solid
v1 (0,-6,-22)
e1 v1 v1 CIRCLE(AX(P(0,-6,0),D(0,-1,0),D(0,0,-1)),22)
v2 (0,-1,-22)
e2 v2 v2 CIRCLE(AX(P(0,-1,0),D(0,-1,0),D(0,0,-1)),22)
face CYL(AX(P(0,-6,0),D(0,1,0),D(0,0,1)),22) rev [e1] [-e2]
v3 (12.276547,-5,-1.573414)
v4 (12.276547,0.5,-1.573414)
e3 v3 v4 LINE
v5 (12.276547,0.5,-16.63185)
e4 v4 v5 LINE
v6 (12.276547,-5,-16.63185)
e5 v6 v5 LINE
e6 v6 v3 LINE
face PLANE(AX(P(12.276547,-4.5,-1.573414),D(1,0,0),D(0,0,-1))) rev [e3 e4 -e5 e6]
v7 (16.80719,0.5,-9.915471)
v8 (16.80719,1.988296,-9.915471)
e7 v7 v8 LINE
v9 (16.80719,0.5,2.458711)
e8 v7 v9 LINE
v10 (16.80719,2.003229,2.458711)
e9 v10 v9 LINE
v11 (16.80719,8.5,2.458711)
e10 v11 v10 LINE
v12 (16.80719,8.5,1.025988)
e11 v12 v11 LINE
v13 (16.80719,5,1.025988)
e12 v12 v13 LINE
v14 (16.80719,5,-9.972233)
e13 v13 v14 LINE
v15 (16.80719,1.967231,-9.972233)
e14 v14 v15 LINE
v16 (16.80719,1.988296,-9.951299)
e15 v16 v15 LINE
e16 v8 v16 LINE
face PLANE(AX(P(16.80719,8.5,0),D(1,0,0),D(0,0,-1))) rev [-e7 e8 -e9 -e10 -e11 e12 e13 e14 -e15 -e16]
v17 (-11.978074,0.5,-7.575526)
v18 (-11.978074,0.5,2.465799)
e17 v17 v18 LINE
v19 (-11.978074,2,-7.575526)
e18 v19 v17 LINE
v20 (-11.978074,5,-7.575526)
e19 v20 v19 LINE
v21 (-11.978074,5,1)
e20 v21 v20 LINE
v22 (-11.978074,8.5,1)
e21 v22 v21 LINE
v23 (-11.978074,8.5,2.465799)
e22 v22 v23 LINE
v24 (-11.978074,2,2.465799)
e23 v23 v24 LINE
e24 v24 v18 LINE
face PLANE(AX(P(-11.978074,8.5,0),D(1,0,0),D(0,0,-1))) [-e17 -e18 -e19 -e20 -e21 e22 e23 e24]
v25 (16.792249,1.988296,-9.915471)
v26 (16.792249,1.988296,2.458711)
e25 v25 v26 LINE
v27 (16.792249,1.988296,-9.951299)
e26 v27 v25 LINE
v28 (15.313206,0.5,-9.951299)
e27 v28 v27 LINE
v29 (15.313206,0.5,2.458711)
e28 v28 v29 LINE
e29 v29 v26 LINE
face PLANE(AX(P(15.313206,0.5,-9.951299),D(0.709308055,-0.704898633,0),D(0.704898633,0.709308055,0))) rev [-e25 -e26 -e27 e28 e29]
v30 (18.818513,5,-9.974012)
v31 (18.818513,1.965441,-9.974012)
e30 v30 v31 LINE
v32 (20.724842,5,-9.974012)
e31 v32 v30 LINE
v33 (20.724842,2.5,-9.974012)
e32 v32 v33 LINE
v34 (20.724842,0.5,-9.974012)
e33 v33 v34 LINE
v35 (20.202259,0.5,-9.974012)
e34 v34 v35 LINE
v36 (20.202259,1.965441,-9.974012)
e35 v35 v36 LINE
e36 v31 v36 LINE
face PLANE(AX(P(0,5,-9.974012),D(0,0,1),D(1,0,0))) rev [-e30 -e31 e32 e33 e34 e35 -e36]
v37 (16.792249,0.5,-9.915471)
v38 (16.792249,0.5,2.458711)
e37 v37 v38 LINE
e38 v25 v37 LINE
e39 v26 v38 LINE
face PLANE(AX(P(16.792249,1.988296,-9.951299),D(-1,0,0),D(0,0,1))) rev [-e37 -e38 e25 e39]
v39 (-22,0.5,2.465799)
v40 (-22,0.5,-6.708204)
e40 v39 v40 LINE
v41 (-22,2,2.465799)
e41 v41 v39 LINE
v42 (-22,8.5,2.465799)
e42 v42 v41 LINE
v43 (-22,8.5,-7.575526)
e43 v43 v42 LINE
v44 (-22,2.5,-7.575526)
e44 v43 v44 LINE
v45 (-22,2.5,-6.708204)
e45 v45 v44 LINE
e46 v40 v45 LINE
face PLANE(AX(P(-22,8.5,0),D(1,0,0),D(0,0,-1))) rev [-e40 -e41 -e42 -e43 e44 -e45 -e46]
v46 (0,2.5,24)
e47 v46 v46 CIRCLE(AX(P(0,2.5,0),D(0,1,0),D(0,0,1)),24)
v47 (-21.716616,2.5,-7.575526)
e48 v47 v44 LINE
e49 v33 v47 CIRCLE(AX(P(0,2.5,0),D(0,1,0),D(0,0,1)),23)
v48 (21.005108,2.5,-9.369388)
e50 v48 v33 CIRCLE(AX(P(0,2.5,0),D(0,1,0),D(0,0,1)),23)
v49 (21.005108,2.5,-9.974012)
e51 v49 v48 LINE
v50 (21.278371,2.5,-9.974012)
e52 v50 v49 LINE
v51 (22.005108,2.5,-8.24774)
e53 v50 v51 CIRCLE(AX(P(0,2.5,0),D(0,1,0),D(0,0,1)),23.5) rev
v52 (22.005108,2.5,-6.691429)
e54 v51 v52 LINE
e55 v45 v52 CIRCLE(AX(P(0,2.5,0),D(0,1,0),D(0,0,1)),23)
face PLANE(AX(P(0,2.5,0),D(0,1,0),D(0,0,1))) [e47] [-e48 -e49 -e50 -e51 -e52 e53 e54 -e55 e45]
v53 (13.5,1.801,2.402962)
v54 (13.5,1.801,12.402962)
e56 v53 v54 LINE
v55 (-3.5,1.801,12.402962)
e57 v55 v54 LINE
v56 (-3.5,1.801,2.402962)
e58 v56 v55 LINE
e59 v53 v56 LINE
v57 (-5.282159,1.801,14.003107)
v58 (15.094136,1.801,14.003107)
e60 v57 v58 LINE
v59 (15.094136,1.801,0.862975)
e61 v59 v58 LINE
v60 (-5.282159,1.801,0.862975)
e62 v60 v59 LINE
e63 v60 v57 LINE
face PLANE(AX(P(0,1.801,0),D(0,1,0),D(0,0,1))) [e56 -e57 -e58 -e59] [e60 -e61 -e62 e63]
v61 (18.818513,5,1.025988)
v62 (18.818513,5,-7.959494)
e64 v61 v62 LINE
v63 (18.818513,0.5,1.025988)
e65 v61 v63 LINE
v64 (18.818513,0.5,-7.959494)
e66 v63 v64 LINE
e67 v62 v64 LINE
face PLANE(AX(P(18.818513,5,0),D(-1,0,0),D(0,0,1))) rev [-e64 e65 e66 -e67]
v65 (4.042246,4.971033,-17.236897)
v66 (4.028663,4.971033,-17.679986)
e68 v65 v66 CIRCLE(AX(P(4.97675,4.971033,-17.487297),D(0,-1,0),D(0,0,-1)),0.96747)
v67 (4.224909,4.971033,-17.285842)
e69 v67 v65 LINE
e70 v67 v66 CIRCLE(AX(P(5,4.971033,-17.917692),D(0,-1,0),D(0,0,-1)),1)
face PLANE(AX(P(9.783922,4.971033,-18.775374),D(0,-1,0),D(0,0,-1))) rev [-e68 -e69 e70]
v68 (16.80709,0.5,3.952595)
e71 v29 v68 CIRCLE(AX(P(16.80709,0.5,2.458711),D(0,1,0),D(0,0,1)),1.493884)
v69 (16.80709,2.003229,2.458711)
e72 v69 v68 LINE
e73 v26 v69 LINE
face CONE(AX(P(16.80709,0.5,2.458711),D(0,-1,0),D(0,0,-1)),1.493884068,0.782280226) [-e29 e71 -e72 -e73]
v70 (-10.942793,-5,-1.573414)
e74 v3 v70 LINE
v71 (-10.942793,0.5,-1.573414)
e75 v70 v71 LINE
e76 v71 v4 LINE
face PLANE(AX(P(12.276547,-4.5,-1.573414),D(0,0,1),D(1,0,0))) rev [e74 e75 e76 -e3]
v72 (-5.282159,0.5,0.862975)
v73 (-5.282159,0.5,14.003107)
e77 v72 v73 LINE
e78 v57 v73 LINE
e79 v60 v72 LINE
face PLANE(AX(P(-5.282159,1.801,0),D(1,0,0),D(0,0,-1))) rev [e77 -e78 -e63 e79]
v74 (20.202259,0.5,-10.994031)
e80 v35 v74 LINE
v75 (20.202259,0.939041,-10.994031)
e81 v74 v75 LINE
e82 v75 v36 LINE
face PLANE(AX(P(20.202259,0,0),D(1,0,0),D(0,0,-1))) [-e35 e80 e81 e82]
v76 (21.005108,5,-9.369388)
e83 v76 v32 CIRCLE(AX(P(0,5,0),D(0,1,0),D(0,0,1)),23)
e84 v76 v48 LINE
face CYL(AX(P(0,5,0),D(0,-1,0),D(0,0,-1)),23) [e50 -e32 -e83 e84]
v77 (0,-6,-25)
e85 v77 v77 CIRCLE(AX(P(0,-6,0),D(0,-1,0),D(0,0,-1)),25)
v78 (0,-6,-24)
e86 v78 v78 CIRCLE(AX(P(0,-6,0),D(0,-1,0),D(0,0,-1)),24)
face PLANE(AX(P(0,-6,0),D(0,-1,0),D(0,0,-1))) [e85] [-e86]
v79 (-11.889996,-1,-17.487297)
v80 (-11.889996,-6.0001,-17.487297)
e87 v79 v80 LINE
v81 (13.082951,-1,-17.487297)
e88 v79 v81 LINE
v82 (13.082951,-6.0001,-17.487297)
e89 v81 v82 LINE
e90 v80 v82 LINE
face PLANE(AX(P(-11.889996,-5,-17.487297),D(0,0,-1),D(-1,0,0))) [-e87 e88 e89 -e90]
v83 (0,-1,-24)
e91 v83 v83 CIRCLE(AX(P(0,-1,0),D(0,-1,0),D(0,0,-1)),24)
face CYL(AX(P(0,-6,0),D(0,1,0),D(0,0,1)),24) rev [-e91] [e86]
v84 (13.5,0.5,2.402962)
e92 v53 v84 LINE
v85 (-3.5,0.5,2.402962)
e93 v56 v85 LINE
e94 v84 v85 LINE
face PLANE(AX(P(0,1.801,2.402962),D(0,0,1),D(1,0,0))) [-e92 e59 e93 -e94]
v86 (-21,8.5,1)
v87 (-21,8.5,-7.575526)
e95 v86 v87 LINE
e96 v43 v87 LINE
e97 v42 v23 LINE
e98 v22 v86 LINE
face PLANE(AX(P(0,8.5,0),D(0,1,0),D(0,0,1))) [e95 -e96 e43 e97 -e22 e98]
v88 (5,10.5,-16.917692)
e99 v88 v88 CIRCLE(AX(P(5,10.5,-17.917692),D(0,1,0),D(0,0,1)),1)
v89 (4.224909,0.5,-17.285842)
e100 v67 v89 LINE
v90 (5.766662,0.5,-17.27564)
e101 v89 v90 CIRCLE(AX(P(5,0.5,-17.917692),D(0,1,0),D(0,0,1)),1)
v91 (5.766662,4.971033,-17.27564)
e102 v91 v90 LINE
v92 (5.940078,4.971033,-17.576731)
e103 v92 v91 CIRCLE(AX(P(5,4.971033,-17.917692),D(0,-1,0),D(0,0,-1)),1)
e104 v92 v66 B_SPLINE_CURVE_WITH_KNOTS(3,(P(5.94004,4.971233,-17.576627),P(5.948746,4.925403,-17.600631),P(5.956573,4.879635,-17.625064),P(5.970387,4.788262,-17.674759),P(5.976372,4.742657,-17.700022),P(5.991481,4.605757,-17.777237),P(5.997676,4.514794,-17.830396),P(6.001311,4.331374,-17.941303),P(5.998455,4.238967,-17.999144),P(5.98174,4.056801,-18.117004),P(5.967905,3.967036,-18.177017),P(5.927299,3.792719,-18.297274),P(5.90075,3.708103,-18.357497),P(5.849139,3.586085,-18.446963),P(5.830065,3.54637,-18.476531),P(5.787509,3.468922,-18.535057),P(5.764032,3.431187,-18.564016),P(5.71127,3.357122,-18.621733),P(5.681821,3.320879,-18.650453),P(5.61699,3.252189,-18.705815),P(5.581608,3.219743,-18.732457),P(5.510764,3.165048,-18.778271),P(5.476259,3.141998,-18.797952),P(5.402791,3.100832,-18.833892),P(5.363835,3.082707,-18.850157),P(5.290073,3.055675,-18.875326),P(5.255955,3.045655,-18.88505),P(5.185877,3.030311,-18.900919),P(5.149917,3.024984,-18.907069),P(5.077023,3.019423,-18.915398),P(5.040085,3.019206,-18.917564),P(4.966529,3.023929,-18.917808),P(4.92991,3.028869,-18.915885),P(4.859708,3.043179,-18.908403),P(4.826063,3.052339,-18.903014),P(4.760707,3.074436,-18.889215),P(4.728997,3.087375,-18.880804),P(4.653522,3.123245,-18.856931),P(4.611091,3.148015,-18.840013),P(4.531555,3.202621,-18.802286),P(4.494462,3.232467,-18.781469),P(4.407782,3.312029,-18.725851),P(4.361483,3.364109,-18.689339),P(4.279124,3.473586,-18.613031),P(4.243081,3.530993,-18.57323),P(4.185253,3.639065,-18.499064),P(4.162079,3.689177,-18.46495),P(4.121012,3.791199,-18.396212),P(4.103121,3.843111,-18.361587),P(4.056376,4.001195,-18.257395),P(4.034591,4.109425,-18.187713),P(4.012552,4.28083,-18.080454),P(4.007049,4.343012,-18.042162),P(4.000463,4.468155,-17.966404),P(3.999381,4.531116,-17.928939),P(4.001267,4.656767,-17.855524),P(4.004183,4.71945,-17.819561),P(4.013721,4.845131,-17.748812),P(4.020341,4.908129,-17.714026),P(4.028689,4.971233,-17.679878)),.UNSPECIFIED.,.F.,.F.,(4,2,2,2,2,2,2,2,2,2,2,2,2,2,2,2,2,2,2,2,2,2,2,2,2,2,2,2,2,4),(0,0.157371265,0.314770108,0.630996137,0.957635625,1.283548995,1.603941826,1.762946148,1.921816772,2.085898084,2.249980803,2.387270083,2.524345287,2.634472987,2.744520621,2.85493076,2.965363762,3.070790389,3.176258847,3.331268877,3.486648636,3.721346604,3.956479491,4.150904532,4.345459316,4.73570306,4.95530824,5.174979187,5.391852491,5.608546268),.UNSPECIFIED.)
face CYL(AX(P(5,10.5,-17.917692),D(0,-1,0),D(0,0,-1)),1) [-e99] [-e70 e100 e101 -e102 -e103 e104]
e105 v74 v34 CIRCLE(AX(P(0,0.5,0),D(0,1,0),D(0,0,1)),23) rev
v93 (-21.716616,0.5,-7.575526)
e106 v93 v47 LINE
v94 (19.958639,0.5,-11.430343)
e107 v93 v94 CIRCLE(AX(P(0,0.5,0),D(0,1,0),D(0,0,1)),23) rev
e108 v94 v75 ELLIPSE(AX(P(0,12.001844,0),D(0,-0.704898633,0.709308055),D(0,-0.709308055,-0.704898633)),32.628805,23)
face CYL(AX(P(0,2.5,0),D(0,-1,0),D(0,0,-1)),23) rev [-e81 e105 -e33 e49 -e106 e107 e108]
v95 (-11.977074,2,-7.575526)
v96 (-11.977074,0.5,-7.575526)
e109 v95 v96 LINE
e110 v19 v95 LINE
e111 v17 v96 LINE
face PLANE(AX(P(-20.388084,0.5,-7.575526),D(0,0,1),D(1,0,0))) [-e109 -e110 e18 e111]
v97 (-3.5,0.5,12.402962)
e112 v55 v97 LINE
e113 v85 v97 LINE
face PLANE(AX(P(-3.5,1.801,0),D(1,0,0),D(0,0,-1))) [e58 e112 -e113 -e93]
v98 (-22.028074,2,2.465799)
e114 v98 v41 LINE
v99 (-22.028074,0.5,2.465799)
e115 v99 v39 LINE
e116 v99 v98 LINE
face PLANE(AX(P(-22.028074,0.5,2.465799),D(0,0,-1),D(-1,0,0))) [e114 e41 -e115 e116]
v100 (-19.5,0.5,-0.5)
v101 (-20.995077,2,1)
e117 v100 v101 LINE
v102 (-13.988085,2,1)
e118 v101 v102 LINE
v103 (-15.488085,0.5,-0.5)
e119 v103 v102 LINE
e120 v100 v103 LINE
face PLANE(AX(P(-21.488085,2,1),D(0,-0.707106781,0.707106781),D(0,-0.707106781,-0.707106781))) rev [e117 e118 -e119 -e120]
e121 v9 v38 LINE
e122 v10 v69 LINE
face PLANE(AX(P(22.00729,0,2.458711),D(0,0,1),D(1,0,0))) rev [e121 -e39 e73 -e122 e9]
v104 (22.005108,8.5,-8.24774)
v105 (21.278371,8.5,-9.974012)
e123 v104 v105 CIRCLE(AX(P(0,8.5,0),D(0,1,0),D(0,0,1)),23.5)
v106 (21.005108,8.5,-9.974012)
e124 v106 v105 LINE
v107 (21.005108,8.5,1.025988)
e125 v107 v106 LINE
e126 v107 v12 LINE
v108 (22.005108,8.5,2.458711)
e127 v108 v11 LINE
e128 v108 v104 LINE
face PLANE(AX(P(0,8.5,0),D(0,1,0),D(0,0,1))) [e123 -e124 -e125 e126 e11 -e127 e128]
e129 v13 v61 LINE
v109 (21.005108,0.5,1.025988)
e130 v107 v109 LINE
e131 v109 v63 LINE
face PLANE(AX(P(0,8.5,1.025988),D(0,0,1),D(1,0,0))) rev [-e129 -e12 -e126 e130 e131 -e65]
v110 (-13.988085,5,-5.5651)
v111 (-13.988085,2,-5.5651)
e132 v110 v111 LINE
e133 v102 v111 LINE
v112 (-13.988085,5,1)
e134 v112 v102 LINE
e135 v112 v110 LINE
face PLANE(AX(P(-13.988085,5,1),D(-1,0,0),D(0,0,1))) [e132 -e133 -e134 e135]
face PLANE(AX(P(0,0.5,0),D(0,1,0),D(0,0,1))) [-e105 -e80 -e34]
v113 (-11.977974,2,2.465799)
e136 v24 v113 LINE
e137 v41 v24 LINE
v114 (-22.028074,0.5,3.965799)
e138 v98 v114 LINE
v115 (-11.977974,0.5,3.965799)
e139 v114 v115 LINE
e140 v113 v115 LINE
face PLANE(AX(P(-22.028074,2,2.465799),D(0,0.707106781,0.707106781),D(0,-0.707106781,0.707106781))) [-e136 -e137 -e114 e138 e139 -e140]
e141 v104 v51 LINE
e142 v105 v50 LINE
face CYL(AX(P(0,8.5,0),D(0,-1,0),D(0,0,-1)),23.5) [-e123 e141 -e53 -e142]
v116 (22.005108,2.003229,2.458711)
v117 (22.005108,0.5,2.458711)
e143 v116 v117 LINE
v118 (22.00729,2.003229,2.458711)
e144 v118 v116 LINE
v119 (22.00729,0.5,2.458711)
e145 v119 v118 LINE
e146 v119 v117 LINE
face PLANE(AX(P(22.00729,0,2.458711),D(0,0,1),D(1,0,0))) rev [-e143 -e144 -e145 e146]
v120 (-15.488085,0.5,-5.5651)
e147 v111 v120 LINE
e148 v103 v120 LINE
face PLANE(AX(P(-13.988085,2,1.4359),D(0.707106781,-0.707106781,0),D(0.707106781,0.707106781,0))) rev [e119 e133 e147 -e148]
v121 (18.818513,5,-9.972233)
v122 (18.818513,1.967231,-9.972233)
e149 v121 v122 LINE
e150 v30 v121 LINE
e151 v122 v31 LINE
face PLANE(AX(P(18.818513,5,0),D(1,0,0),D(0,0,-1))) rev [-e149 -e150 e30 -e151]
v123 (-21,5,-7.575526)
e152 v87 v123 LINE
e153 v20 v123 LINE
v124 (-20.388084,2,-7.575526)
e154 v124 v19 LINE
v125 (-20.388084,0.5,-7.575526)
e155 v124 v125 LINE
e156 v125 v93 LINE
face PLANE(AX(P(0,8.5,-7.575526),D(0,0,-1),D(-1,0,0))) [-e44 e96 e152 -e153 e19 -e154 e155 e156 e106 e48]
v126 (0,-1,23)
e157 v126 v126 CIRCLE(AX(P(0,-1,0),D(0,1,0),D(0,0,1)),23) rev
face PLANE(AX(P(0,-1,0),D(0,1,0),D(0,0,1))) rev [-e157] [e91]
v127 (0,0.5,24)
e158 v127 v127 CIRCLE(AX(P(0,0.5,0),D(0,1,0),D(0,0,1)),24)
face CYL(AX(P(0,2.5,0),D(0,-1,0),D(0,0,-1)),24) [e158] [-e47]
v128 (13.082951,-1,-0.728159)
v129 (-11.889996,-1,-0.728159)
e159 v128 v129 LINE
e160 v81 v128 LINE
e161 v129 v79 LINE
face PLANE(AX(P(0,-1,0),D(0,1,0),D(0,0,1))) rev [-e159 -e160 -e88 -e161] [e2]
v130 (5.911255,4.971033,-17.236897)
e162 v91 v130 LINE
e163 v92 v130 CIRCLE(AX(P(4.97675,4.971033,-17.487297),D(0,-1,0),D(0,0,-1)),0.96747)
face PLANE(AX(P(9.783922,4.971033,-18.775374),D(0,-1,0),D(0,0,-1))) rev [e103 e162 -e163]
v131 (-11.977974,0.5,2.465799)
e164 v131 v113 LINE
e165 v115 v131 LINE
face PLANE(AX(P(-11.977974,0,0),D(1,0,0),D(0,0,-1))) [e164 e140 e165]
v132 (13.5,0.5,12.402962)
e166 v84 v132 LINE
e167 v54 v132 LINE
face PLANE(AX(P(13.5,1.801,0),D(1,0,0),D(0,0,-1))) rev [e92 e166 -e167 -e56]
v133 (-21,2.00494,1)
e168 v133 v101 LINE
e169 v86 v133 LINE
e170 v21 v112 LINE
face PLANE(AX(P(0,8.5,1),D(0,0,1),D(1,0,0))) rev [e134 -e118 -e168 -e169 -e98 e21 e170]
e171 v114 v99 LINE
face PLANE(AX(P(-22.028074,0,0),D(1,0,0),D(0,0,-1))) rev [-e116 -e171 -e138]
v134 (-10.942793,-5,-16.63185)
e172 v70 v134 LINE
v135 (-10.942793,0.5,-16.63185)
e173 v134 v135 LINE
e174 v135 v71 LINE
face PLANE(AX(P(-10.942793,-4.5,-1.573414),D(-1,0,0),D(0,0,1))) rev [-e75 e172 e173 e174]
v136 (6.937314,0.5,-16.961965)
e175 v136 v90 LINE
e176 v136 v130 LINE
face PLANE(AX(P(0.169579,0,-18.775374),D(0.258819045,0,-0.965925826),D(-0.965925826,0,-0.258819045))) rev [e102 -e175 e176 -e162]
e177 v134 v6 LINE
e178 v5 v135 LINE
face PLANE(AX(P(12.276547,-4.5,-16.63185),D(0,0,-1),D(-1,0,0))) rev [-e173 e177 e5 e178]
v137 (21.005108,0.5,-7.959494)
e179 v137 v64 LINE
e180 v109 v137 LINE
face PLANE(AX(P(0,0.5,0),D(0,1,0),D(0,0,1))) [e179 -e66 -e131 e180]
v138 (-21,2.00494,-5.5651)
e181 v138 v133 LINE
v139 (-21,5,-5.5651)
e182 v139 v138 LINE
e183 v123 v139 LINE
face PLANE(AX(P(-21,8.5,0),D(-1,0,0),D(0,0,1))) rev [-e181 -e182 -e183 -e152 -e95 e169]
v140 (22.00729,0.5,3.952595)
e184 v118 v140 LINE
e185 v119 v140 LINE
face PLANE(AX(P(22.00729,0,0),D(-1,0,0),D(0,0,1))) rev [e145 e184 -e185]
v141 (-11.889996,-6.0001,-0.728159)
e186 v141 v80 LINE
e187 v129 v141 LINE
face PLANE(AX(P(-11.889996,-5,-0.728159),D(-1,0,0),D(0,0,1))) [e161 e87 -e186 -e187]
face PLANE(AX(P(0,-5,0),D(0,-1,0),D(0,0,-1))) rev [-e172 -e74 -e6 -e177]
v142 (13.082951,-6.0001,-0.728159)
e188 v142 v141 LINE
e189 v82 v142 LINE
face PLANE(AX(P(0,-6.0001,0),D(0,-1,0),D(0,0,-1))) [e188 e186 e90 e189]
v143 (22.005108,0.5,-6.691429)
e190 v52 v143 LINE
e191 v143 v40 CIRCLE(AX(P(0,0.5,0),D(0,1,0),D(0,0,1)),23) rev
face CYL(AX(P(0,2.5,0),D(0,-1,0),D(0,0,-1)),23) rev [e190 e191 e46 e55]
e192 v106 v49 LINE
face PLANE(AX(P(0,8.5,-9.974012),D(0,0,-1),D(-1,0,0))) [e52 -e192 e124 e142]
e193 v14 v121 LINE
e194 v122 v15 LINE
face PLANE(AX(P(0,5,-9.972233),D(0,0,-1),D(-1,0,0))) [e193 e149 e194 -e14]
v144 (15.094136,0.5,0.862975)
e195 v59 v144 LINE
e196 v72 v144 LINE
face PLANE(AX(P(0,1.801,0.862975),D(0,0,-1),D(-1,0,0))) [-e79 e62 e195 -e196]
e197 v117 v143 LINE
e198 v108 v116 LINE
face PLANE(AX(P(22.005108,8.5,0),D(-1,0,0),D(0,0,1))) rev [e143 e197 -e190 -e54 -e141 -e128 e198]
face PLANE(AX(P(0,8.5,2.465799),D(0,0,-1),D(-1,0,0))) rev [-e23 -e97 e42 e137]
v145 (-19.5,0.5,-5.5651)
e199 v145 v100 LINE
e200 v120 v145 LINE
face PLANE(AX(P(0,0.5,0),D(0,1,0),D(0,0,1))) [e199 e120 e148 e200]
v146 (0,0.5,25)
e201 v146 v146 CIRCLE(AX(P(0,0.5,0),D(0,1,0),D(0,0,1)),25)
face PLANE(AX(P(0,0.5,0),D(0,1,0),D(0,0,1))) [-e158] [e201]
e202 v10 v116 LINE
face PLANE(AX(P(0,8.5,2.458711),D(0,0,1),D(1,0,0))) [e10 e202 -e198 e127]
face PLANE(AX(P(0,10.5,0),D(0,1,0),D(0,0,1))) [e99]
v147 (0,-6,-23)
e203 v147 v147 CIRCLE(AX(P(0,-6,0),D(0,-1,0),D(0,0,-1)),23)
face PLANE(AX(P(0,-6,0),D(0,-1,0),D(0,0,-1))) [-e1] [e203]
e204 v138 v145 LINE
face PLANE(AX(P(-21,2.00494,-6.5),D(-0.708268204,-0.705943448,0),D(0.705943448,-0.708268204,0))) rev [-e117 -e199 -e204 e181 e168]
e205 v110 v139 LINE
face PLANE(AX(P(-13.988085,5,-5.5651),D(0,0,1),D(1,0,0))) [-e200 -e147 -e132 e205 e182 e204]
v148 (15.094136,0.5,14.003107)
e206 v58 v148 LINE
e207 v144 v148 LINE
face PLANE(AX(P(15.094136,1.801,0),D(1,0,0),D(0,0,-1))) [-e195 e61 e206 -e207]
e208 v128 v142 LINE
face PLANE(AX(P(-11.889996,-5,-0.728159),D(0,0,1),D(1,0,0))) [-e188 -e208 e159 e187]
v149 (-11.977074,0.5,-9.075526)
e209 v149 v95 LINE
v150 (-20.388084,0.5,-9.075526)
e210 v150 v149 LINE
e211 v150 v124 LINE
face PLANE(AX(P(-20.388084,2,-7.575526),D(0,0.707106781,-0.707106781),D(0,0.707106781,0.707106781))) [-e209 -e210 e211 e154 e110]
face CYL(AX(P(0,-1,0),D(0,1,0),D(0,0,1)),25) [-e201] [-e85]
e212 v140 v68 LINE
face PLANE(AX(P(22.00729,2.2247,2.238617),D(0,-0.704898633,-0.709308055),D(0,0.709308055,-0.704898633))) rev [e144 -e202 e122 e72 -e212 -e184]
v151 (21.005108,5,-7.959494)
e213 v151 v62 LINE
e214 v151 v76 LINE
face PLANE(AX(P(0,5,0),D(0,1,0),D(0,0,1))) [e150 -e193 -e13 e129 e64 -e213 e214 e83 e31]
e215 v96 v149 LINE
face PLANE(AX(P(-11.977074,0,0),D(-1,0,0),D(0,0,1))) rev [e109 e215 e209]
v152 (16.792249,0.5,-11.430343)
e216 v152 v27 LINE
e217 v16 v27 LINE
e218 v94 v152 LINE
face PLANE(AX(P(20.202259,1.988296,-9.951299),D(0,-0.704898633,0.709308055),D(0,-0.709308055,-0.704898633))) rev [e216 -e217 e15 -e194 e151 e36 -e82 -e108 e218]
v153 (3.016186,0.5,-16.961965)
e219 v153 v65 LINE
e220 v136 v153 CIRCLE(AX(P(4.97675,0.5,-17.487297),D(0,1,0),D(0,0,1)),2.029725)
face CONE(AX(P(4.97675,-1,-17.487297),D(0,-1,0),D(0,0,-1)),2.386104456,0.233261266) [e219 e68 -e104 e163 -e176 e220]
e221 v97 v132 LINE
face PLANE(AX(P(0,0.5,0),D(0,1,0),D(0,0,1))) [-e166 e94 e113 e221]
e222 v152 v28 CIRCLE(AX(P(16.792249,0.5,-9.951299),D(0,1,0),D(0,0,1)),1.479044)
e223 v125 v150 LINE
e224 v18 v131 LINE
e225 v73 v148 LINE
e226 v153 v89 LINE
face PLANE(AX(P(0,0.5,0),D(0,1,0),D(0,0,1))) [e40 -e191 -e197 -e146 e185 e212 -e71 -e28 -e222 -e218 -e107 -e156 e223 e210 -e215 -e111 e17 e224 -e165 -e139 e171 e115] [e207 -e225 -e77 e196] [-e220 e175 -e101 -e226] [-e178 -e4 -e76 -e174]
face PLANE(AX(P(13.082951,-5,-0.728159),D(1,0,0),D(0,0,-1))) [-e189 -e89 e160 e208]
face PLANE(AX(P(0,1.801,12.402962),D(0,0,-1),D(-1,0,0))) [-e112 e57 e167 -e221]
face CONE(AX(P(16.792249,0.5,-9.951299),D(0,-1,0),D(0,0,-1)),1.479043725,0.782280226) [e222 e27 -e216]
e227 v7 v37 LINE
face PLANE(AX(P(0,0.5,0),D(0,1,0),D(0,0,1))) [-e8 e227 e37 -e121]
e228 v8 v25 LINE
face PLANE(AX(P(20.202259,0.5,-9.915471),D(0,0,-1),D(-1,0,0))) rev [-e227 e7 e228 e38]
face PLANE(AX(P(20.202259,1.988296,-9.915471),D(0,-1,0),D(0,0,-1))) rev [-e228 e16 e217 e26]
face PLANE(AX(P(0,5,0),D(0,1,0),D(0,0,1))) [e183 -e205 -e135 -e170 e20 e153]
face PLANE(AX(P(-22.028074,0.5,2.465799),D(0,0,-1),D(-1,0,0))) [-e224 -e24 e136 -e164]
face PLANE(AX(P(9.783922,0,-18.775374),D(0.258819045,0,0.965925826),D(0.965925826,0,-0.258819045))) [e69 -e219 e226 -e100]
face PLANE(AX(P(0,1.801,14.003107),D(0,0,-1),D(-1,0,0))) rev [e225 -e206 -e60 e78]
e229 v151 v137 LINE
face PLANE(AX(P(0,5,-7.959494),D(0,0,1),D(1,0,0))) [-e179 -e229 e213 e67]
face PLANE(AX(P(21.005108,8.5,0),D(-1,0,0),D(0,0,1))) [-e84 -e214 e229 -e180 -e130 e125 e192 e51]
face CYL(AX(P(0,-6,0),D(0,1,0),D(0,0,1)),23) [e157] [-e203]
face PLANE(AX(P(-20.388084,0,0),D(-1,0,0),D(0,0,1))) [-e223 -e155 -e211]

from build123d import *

# Parameters (mm, degrees)
BOSS_EXTRUDE1_DEPTH       = 0.5
BOSS_EXTRUDE1_DEPTH_BACK  = 1
SKETCH1_R                 = 25
SKETCH17_R                = 24
SKETCH17_R_2              = 23
BOSS_EXTRUDE15_DEPTH      = 2
SKETCH2_R                 = 1
BOSS_EXTRUDE2_DEPTH       = 10
SKETCH12_W                = 23.219340148
SKETCH12_H                = 15.058436642
CUT_EXTRUDE2_DEPTH        = 5
SKETCH15_W                = 24.972946701
SKETCH15_H                = 16.75913787
SKETCH15_W_2              = 23.219340148
SKETCH15_H_2              = 15.058436642
BOSS_EXTRUDE13_DEPTH      = 5
BOSS_EXTRUDE14_DEPTH      = 0.0001
BOSS_EXTRUDE14_DEPTH_BACK = 1
SKETCH16_W                = 24.972946701
SKETCH16_H                = 16.75913787
BOSS_EXTRUDE16_DEPTH      = 8
BOSS_EXTRUDE17_DEPTH      = 1.301
BOSS_EXTRUDE18_DEPTH      = 4.5
REVOLVE1_ANGLE            = 195
REVOLVE1_OTHER_WAY_ANGLE  = 15
BOSS_EXTRUDE20_DEPTH      = 7.5
BOSS_EXTRUDE21_DEPTH      = 7.5
BOSS_EXTRUDE22_DEPTH      = 0.0001
BOSS_EXTRUDE22_DEPTH_BACK = 10.05
BOSS_EXTRUDE23_DEPTH      = 0.0001
BOSS_EXTRUDE23_DEPTH_BACK = 5.2001
REVOLVE2_ANGLE            = 90
BOSS_EXTRUDE25_DEPTH      = 12.41001
REVOLVE3_ANGLE            = 90
BOSS_EXTRUDE26_DEPTH      = 3.41001
BOSS_EXTRUDE27_DEPTH      = 0.001
BOSS_EXTRUDE27_DEPTH_BACK = 8.41001
BOSS_EXTRUDE28_DEPTH      = 7.001
BOSS_EXTRUDE29_START      = 5
SKETCH39_R                = 25
SKETCH39_R_2              = 24
SKETCH39_R_3              = 23
SKETCH39_R_4              = 22
BOSS_EXTRUDE29_DEPTH      = 5


# Read off the part's stored shape, not the designer's step: Boss-Extrude18
with BuildPart() as part:
    # Sketch1 → Boss-Extrude1 (new, two sides: drawn at the far end of the back side and taken through both)
    with BuildSketch(Plane(origin=(0, 0, 0), x_dir=(1, 0, 0), z_dir=(0, 1, 0)).offset(-BOSS_EXTRUDE1_DEPTH_BACK)):
        with Locations(Location((0, 0, 0), (0, 0, 270))):
            Circle(SKETCH1_R)
    extrude(amount=BOSS_EXTRUDE1_DEPTH + BOSS_EXTRUDE1_DEPTH_BACK)

    # Sketch17 → Boss-Extrude15 (add)
    with BuildSketch(Plane(origin=(0, 0.5, 0), x_dir=(1, 0, 0), z_dir=(0, 1, 0))):
        with Locations(Location((0, 0, 0), (0, 0, 270))):
            Circle(SKETCH17_R)
        with Locations(Location((0, 0, 0), (0, 0, 270))):
            Circle(SKETCH17_R_2, mode=Mode.SUBTRACT)
    extrude(amount=BOSS_EXTRUDE15_DEPTH)

    # Sketch2 → Boss-Extrude2 (add)
    with BuildSketch(Plane(origin=(0, 0.5, 0), x_dir=(1, 0, 0), z_dir=(0, 1, 0))):
        with Locations(Location((5, 17.917691699, 0), (0, 0, 270))):
            Circle(SKETCH2_R)
    extrude(amount=BOSS_EXTRUDE2_DEPTH)

    # Sketch12 → Cut-Extrude2 (cut)
    with BuildSketch(Plane(origin=(0, 0.5, 0), x_dir=(1, 0, 0), z_dir=(0, 1, 0))):
        with Locations((0.666876956, 9.102631979)):
            Rectangle(SKETCH12_W, SKETCH12_H)
    extrude(amount=-CUT_EXTRUDE2_DEPTH, mode=Mode.SUBTRACT)

    # Sketch15 → Boss-Extrude13 (add)
    with BuildSketch(Plane.XZ.offset(1)):
        with Locations((0.596477735, -9.107727728)):
            Rectangle(SKETCH15_W, SKETCH15_H)
        with Locations((0.666876956, -9.102631979)):
            Rectangle(SKETCH15_W_2, SKETCH15_H_2, mode=Mode.SUBTRACT)
    extrude(amount=BOSS_EXTRUDE13_DEPTH)

    # Sketch3 → Boss-Extrude16 (add)
    with BuildSketch(Plane(origin=(0, 0.5, 0), x_dir=(1, 0, 0), z_dir=(0, 1, 0))):
        Polygon((-11.97807381, -2.465798727), (-11.97807381, -1), (-21, -1), (-21, 7.575525784), (-22, 7.575525784), (-22, -2.465798727), align=None)
        with BuildLine():
            ThreePointArc((22.005108017, 8.247740366), (21.658944991, 9.118119426), (21.278371263, 9.97401205))
            Line((21.278371263, 9.97401205), (21.005108017, 9.97401205))
            Line((21.005108017, 9.97401205), (21.005108017, -1.02598795))
            Line((21.005108017, -1.02598795), (16.80718978, -1.02598795))
            Line((16.80718978, -1.02598795), (16.80718978, -2.458711062))
            Line((16.80718978, -2.458711062), (22.005108017, -2.458711062))
            Line((22.005108017, -2.458711062), (22.005108017, 8.247740366))
        make_face()
    extrude(amount=BOSS_EXTRUDE16_DEPTH)

    # Sketch18 → Boss-Extrude17 (add)
    with BuildSketch(Plane(origin=(0, 0.5, 0), x_dir=(1, 0, 0), z_dir=(0, 1, 0))):
        Polygon((0, -2.402962183), (0, -0.862974972), (-5.282158739, -0.862974972), (-5.282158739, -14.003106764), (0, -14.003106764), (0, -12.402962183), (-3.5, -12.402962183), (-3.5, -2.402962183), align=None)
        Polygon((15.094136196, -0.862974972), (0.201079682, -0.862974972), (0.559908327, -2.402962183), (13.5, -2.402962183), (13.5, -12.402962183), (2.889983811, -12.402962183), (3.262829577, -14.003106764), (15.094136196, -14.003106764), align=None)
        Polygon((2.889983811, -12.402962183), (0, -12.402962183), (0, -14.003106764), (3.262829577, -14.003106764), align=None)
        Polygon((0.201079682, -0.862974972), (0, -0.862974972), (0, -2.402962183), (0.559908327, -2.402962183), align=None)
    extrude(amount=BOSS_EXTRUDE17_DEPTH)

    # Boss-Extrude18 outline → Boss-Extrude18 (add)
    with BuildSketch(Plane(origin=(0, 0.5, 0), x_dir=(1, 0, 0), z_dir=(0, 1, 0))):
        with BuildLine():
            Line((20.724842186, 9.97401205), (18.818512993, 9.97401205))
            Line((18.818512993, 9.97401205), (18.818512993, 9.972233135))
            Line((18.818512993, 9.972233135), (16.80718978, 9.972233135))
            Line((16.80718978, 9.972233135), (16.80718978, -1.02598795))
            Line((16.80718978, -1.02598795), (18.818512993, -1.02598795))
            Line((18.818512993, -1.02598795), (18.818512993, 7.959494075))
            Line((18.818512993, 7.959494075), (21.005108017, 7.959494075))
            Line((21.005108017, 7.959494075), (21.005108017, 9.369388304))
            ThreePointArc((21.005108017, 9.369388304), (20.867165079, 9.672715314), (20.724842186, 9.97401205))
        make_face()
        Polygon((-13.988084857, -1), (-11.97807381, -1), (-11.97807381, 7.575525784), (-21, 7.575525784), (-21, 5.565099869), (-13.988084857, 5.565099869), align=None)
    extrude(amount=BOSS_EXTRUDE18_DEPTH)

    # Sketch22 → Revolve1 (revolve)
    with BuildSketch(Plane(origin=(0, 0, -17.487296663), x_dir=(-1, 0, 0), z_dir=(0, 0, -1))):
        Polygon((-4.976750106, 2.5), (-4.976750106, 4.97103297), (-5.944220353, 4.97103297), (-7.362854562, -1), (-4.976750106, -1), align=None)
    revolve(axis=Axis((4.976750106, 2.5, -17.487296663), (0, 1, 0)), revolution_arc=REVOLVE1_ANGLE)

    # Sketch22 → Revolve1 other way (revolve)
    with BuildSketch(Plane(origin=(0, 0, -17.487296663), x_dir=(-1, 0, 0), z_dir=(0, 0, -1))):
        Polygon((-4.976750106, 2.5), (-4.976750106, 4.97103297), (-5.944220353, 4.97103297), (-7.362854562, -1), (-4.976750106, -1), align=None)
    revolve(axis=Axis((4.976750106, 2.5, -17.487296663), (0, -1, 0)), revolution_arc=REVOLVE1_OTHER_WAY_ANGLE)

    # Sketch23 → Boss-Extrude20 (add)
    with BuildSketch(Plane(origin=(0, 0, 1), x_dir=(-1, 0, 0), z_dir=(0, 0, -1))):
        Polygon((21, 0.5), (21, 2.00493968), (19.5, 0.5), align=None)
    extrude(amount=BOSS_EXTRUDE20_DEPTH)

    # Sketch24 → Boss-Extrude21 (add)
    with BuildSketch(Plane.ZY.offset(13.988084857)):
        Polygon((1, 0.5), (1, 2), (-0.5, 0.5), align=None)
    extrude(amount=BOSS_EXTRUDE21_DEPTH)

    # Sketch25 → Boss-Extrude22 (add, two sides: drawn at the far end of the back side and taken through both)
    with BuildSketch(Plane(origin=(-11.97807381, 0, 0), x_dir=(0, 0, -1), z_dir=(1, 0, 0)).offset(-BOSS_EXTRUDE22_DEPTH_BACK)):
        Polygon((-2.465798727, 0.5), (-3.965798727, 0.5), (-2.465798727, 2), align=None)
    extrude(amount=BOSS_EXTRUDE22_DEPTH + BOSS_EXTRUDE22_DEPTH_BACK)

    # Sketch28 → Boss-Extrude23 (add, two sides: drawn at the far end of the back side and taken through both)
    with BuildSketch(Plane.ZY.offset(-16.80718978).offset(-BOSS_EXTRUDE23_DEPTH_BACK)):
        Polygon((2.458711062, 2.003228909), (2.458711062, 0.5), (3.95259513, 0.5), align=None)
    extrude(amount=BOSS_EXTRUDE23_DEPTH + BOSS_EXTRUDE23_DEPTH_BACK)

    # Sketch30 → Revolve2 (revolve)
    with BuildSketch(Plane.ZY.offset(-16.80708978)):
        Polygon((2.458711062, 2.003228909), (2.458711062, 0.5), (3.95259513, 0.5), align=None)
    revolve(axis=Axis((16.80708978, 2.003228909, 2.458711062), (0, -1, 0)), revolution_arc=REVOLVE2_ANGLE)

    # Sketch31 → Boss-Extrude25 (add)
    with BuildSketch(Plane(origin=(0, 0, 2.458711062), x_dir=(-1, 0, 0), z_dir=(0, 0, -1))):
        Polygon((-16.792249437, 1.988295734), (-16.792249437, 0.5), (-15.313205712, 0.5), align=None)
    extrude(amount=BOSS_EXTRUDE25_DEPTH)

    # Sketch32 → Revolve3 (revolve)
    with BuildSketch(Plane(origin=(0, 0, -9.951298938), x_dir=(-1, 0, 0), z_dir=(0, 0, -1))):
        Polygon((-16.792249437, 1.988295734), (-16.792249437, 0.5), (-15.313205712, 0.5), align=None)
    revolve(axis=Axis((16.792249437, 1.988295734, -9.951298938), (0, -1, 0)), revolution_arc=REVOLVE3_ANGLE)

    # Sketch33 → Boss-Extrude26 (add)
    with BuildSketch(Plane(origin=(16.792249437, 0, 0), x_dir=(0, 0, -1), z_dir=(1, 0, 0))):
        Polygon((9.951298938, 1.988295734), (11.430342663, 0.5), (9.951298938, 0.5), (9.915470666, 0.5), (9.915470666, 1.988295734), align=None)
    extrude(amount=BOSS_EXTRUDE26_DEPTH)

    # Sketch34 → Boss-Extrude27 (add, two sides: drawn at the far end of the back side and taken through both)
    with BuildSketch(Plane(origin=(-11.97807381, 0, 0), x_dir=(0, 0, -1), z_dir=(1, 0, 0)).offset(-BOSS_EXTRUDE27_DEPTH_BACK)):
        Polygon((7.575525784, 0.5), (9.075525784, 0.5), (7.575525784, 2), align=None)
    extrude(amount=BOSS_EXTRUDE27_DEPTH + BOSS_EXTRUDE27_DEPTH_BACK)

    # Sketch37 → Boss-Extrude28 (add)
    with BuildSketch(Plane.XY.offset(-5.565099869)):
        Polygon((-13.988084857, 0.5), (-13.988084857, 2), (-15.488084857, 0.5), align=None)
    extrude(amount=BOSS_EXTRUDE28_DEPTH)


with BuildPart() as body_2:
    # Sketch16 → Boss-Extrude14 (new, two sides: drawn at the far end of the back side and taken through both)
    with BuildSketch(Plane(origin=(0, -6, 0), x_dir=(-1, 0, 0), z_dir=(0, -1, 0)).offset(-BOSS_EXTRUDE14_DEPTH_BACK)):
        with Locations((-0.596477735, 9.107727728)):
            Rectangle(SKETCH16_W, SKETCH16_H)
    extrude(amount=BOSS_EXTRUDE14_DEPTH + BOSS_EXTRUDE14_DEPTH_BACK)


    add(part.part)  # Boss-Extrude29 merges part
    # Sketch39 → Boss-Extrude29 (add)
    # profile 1 of 2: a face of its own
    with BuildSketch(Plane.XZ.offset(1).offset(BOSS_EXTRUDE29_START)):
        with Locations(Location((0, 0, 0), (0, 0, 90))):
            Circle(SKETCH39_R)
        with Locations(Location((0, 0, 0), (0, 0, 90))):
            Circle(SKETCH39_R_2, mode=Mode.SUBTRACT)
    # profile 2 of 2: a face of its own
    with BuildSketch(Plane.XZ.offset(1).offset(BOSS_EXTRUDE29_START)):
        with Locations(Location((0, 0, 0), (0, 0, 90))):
            Circle(SKETCH39_R_3)
        with Locations(Location((0, 0, 0), (0, 0, 270))):
            Circle(SKETCH39_R_4, mode=Mode.SUBTRACT)
    extrude(amount=-BOSS_EXTRUDE29_DEPTH)


solid = body_2.part
